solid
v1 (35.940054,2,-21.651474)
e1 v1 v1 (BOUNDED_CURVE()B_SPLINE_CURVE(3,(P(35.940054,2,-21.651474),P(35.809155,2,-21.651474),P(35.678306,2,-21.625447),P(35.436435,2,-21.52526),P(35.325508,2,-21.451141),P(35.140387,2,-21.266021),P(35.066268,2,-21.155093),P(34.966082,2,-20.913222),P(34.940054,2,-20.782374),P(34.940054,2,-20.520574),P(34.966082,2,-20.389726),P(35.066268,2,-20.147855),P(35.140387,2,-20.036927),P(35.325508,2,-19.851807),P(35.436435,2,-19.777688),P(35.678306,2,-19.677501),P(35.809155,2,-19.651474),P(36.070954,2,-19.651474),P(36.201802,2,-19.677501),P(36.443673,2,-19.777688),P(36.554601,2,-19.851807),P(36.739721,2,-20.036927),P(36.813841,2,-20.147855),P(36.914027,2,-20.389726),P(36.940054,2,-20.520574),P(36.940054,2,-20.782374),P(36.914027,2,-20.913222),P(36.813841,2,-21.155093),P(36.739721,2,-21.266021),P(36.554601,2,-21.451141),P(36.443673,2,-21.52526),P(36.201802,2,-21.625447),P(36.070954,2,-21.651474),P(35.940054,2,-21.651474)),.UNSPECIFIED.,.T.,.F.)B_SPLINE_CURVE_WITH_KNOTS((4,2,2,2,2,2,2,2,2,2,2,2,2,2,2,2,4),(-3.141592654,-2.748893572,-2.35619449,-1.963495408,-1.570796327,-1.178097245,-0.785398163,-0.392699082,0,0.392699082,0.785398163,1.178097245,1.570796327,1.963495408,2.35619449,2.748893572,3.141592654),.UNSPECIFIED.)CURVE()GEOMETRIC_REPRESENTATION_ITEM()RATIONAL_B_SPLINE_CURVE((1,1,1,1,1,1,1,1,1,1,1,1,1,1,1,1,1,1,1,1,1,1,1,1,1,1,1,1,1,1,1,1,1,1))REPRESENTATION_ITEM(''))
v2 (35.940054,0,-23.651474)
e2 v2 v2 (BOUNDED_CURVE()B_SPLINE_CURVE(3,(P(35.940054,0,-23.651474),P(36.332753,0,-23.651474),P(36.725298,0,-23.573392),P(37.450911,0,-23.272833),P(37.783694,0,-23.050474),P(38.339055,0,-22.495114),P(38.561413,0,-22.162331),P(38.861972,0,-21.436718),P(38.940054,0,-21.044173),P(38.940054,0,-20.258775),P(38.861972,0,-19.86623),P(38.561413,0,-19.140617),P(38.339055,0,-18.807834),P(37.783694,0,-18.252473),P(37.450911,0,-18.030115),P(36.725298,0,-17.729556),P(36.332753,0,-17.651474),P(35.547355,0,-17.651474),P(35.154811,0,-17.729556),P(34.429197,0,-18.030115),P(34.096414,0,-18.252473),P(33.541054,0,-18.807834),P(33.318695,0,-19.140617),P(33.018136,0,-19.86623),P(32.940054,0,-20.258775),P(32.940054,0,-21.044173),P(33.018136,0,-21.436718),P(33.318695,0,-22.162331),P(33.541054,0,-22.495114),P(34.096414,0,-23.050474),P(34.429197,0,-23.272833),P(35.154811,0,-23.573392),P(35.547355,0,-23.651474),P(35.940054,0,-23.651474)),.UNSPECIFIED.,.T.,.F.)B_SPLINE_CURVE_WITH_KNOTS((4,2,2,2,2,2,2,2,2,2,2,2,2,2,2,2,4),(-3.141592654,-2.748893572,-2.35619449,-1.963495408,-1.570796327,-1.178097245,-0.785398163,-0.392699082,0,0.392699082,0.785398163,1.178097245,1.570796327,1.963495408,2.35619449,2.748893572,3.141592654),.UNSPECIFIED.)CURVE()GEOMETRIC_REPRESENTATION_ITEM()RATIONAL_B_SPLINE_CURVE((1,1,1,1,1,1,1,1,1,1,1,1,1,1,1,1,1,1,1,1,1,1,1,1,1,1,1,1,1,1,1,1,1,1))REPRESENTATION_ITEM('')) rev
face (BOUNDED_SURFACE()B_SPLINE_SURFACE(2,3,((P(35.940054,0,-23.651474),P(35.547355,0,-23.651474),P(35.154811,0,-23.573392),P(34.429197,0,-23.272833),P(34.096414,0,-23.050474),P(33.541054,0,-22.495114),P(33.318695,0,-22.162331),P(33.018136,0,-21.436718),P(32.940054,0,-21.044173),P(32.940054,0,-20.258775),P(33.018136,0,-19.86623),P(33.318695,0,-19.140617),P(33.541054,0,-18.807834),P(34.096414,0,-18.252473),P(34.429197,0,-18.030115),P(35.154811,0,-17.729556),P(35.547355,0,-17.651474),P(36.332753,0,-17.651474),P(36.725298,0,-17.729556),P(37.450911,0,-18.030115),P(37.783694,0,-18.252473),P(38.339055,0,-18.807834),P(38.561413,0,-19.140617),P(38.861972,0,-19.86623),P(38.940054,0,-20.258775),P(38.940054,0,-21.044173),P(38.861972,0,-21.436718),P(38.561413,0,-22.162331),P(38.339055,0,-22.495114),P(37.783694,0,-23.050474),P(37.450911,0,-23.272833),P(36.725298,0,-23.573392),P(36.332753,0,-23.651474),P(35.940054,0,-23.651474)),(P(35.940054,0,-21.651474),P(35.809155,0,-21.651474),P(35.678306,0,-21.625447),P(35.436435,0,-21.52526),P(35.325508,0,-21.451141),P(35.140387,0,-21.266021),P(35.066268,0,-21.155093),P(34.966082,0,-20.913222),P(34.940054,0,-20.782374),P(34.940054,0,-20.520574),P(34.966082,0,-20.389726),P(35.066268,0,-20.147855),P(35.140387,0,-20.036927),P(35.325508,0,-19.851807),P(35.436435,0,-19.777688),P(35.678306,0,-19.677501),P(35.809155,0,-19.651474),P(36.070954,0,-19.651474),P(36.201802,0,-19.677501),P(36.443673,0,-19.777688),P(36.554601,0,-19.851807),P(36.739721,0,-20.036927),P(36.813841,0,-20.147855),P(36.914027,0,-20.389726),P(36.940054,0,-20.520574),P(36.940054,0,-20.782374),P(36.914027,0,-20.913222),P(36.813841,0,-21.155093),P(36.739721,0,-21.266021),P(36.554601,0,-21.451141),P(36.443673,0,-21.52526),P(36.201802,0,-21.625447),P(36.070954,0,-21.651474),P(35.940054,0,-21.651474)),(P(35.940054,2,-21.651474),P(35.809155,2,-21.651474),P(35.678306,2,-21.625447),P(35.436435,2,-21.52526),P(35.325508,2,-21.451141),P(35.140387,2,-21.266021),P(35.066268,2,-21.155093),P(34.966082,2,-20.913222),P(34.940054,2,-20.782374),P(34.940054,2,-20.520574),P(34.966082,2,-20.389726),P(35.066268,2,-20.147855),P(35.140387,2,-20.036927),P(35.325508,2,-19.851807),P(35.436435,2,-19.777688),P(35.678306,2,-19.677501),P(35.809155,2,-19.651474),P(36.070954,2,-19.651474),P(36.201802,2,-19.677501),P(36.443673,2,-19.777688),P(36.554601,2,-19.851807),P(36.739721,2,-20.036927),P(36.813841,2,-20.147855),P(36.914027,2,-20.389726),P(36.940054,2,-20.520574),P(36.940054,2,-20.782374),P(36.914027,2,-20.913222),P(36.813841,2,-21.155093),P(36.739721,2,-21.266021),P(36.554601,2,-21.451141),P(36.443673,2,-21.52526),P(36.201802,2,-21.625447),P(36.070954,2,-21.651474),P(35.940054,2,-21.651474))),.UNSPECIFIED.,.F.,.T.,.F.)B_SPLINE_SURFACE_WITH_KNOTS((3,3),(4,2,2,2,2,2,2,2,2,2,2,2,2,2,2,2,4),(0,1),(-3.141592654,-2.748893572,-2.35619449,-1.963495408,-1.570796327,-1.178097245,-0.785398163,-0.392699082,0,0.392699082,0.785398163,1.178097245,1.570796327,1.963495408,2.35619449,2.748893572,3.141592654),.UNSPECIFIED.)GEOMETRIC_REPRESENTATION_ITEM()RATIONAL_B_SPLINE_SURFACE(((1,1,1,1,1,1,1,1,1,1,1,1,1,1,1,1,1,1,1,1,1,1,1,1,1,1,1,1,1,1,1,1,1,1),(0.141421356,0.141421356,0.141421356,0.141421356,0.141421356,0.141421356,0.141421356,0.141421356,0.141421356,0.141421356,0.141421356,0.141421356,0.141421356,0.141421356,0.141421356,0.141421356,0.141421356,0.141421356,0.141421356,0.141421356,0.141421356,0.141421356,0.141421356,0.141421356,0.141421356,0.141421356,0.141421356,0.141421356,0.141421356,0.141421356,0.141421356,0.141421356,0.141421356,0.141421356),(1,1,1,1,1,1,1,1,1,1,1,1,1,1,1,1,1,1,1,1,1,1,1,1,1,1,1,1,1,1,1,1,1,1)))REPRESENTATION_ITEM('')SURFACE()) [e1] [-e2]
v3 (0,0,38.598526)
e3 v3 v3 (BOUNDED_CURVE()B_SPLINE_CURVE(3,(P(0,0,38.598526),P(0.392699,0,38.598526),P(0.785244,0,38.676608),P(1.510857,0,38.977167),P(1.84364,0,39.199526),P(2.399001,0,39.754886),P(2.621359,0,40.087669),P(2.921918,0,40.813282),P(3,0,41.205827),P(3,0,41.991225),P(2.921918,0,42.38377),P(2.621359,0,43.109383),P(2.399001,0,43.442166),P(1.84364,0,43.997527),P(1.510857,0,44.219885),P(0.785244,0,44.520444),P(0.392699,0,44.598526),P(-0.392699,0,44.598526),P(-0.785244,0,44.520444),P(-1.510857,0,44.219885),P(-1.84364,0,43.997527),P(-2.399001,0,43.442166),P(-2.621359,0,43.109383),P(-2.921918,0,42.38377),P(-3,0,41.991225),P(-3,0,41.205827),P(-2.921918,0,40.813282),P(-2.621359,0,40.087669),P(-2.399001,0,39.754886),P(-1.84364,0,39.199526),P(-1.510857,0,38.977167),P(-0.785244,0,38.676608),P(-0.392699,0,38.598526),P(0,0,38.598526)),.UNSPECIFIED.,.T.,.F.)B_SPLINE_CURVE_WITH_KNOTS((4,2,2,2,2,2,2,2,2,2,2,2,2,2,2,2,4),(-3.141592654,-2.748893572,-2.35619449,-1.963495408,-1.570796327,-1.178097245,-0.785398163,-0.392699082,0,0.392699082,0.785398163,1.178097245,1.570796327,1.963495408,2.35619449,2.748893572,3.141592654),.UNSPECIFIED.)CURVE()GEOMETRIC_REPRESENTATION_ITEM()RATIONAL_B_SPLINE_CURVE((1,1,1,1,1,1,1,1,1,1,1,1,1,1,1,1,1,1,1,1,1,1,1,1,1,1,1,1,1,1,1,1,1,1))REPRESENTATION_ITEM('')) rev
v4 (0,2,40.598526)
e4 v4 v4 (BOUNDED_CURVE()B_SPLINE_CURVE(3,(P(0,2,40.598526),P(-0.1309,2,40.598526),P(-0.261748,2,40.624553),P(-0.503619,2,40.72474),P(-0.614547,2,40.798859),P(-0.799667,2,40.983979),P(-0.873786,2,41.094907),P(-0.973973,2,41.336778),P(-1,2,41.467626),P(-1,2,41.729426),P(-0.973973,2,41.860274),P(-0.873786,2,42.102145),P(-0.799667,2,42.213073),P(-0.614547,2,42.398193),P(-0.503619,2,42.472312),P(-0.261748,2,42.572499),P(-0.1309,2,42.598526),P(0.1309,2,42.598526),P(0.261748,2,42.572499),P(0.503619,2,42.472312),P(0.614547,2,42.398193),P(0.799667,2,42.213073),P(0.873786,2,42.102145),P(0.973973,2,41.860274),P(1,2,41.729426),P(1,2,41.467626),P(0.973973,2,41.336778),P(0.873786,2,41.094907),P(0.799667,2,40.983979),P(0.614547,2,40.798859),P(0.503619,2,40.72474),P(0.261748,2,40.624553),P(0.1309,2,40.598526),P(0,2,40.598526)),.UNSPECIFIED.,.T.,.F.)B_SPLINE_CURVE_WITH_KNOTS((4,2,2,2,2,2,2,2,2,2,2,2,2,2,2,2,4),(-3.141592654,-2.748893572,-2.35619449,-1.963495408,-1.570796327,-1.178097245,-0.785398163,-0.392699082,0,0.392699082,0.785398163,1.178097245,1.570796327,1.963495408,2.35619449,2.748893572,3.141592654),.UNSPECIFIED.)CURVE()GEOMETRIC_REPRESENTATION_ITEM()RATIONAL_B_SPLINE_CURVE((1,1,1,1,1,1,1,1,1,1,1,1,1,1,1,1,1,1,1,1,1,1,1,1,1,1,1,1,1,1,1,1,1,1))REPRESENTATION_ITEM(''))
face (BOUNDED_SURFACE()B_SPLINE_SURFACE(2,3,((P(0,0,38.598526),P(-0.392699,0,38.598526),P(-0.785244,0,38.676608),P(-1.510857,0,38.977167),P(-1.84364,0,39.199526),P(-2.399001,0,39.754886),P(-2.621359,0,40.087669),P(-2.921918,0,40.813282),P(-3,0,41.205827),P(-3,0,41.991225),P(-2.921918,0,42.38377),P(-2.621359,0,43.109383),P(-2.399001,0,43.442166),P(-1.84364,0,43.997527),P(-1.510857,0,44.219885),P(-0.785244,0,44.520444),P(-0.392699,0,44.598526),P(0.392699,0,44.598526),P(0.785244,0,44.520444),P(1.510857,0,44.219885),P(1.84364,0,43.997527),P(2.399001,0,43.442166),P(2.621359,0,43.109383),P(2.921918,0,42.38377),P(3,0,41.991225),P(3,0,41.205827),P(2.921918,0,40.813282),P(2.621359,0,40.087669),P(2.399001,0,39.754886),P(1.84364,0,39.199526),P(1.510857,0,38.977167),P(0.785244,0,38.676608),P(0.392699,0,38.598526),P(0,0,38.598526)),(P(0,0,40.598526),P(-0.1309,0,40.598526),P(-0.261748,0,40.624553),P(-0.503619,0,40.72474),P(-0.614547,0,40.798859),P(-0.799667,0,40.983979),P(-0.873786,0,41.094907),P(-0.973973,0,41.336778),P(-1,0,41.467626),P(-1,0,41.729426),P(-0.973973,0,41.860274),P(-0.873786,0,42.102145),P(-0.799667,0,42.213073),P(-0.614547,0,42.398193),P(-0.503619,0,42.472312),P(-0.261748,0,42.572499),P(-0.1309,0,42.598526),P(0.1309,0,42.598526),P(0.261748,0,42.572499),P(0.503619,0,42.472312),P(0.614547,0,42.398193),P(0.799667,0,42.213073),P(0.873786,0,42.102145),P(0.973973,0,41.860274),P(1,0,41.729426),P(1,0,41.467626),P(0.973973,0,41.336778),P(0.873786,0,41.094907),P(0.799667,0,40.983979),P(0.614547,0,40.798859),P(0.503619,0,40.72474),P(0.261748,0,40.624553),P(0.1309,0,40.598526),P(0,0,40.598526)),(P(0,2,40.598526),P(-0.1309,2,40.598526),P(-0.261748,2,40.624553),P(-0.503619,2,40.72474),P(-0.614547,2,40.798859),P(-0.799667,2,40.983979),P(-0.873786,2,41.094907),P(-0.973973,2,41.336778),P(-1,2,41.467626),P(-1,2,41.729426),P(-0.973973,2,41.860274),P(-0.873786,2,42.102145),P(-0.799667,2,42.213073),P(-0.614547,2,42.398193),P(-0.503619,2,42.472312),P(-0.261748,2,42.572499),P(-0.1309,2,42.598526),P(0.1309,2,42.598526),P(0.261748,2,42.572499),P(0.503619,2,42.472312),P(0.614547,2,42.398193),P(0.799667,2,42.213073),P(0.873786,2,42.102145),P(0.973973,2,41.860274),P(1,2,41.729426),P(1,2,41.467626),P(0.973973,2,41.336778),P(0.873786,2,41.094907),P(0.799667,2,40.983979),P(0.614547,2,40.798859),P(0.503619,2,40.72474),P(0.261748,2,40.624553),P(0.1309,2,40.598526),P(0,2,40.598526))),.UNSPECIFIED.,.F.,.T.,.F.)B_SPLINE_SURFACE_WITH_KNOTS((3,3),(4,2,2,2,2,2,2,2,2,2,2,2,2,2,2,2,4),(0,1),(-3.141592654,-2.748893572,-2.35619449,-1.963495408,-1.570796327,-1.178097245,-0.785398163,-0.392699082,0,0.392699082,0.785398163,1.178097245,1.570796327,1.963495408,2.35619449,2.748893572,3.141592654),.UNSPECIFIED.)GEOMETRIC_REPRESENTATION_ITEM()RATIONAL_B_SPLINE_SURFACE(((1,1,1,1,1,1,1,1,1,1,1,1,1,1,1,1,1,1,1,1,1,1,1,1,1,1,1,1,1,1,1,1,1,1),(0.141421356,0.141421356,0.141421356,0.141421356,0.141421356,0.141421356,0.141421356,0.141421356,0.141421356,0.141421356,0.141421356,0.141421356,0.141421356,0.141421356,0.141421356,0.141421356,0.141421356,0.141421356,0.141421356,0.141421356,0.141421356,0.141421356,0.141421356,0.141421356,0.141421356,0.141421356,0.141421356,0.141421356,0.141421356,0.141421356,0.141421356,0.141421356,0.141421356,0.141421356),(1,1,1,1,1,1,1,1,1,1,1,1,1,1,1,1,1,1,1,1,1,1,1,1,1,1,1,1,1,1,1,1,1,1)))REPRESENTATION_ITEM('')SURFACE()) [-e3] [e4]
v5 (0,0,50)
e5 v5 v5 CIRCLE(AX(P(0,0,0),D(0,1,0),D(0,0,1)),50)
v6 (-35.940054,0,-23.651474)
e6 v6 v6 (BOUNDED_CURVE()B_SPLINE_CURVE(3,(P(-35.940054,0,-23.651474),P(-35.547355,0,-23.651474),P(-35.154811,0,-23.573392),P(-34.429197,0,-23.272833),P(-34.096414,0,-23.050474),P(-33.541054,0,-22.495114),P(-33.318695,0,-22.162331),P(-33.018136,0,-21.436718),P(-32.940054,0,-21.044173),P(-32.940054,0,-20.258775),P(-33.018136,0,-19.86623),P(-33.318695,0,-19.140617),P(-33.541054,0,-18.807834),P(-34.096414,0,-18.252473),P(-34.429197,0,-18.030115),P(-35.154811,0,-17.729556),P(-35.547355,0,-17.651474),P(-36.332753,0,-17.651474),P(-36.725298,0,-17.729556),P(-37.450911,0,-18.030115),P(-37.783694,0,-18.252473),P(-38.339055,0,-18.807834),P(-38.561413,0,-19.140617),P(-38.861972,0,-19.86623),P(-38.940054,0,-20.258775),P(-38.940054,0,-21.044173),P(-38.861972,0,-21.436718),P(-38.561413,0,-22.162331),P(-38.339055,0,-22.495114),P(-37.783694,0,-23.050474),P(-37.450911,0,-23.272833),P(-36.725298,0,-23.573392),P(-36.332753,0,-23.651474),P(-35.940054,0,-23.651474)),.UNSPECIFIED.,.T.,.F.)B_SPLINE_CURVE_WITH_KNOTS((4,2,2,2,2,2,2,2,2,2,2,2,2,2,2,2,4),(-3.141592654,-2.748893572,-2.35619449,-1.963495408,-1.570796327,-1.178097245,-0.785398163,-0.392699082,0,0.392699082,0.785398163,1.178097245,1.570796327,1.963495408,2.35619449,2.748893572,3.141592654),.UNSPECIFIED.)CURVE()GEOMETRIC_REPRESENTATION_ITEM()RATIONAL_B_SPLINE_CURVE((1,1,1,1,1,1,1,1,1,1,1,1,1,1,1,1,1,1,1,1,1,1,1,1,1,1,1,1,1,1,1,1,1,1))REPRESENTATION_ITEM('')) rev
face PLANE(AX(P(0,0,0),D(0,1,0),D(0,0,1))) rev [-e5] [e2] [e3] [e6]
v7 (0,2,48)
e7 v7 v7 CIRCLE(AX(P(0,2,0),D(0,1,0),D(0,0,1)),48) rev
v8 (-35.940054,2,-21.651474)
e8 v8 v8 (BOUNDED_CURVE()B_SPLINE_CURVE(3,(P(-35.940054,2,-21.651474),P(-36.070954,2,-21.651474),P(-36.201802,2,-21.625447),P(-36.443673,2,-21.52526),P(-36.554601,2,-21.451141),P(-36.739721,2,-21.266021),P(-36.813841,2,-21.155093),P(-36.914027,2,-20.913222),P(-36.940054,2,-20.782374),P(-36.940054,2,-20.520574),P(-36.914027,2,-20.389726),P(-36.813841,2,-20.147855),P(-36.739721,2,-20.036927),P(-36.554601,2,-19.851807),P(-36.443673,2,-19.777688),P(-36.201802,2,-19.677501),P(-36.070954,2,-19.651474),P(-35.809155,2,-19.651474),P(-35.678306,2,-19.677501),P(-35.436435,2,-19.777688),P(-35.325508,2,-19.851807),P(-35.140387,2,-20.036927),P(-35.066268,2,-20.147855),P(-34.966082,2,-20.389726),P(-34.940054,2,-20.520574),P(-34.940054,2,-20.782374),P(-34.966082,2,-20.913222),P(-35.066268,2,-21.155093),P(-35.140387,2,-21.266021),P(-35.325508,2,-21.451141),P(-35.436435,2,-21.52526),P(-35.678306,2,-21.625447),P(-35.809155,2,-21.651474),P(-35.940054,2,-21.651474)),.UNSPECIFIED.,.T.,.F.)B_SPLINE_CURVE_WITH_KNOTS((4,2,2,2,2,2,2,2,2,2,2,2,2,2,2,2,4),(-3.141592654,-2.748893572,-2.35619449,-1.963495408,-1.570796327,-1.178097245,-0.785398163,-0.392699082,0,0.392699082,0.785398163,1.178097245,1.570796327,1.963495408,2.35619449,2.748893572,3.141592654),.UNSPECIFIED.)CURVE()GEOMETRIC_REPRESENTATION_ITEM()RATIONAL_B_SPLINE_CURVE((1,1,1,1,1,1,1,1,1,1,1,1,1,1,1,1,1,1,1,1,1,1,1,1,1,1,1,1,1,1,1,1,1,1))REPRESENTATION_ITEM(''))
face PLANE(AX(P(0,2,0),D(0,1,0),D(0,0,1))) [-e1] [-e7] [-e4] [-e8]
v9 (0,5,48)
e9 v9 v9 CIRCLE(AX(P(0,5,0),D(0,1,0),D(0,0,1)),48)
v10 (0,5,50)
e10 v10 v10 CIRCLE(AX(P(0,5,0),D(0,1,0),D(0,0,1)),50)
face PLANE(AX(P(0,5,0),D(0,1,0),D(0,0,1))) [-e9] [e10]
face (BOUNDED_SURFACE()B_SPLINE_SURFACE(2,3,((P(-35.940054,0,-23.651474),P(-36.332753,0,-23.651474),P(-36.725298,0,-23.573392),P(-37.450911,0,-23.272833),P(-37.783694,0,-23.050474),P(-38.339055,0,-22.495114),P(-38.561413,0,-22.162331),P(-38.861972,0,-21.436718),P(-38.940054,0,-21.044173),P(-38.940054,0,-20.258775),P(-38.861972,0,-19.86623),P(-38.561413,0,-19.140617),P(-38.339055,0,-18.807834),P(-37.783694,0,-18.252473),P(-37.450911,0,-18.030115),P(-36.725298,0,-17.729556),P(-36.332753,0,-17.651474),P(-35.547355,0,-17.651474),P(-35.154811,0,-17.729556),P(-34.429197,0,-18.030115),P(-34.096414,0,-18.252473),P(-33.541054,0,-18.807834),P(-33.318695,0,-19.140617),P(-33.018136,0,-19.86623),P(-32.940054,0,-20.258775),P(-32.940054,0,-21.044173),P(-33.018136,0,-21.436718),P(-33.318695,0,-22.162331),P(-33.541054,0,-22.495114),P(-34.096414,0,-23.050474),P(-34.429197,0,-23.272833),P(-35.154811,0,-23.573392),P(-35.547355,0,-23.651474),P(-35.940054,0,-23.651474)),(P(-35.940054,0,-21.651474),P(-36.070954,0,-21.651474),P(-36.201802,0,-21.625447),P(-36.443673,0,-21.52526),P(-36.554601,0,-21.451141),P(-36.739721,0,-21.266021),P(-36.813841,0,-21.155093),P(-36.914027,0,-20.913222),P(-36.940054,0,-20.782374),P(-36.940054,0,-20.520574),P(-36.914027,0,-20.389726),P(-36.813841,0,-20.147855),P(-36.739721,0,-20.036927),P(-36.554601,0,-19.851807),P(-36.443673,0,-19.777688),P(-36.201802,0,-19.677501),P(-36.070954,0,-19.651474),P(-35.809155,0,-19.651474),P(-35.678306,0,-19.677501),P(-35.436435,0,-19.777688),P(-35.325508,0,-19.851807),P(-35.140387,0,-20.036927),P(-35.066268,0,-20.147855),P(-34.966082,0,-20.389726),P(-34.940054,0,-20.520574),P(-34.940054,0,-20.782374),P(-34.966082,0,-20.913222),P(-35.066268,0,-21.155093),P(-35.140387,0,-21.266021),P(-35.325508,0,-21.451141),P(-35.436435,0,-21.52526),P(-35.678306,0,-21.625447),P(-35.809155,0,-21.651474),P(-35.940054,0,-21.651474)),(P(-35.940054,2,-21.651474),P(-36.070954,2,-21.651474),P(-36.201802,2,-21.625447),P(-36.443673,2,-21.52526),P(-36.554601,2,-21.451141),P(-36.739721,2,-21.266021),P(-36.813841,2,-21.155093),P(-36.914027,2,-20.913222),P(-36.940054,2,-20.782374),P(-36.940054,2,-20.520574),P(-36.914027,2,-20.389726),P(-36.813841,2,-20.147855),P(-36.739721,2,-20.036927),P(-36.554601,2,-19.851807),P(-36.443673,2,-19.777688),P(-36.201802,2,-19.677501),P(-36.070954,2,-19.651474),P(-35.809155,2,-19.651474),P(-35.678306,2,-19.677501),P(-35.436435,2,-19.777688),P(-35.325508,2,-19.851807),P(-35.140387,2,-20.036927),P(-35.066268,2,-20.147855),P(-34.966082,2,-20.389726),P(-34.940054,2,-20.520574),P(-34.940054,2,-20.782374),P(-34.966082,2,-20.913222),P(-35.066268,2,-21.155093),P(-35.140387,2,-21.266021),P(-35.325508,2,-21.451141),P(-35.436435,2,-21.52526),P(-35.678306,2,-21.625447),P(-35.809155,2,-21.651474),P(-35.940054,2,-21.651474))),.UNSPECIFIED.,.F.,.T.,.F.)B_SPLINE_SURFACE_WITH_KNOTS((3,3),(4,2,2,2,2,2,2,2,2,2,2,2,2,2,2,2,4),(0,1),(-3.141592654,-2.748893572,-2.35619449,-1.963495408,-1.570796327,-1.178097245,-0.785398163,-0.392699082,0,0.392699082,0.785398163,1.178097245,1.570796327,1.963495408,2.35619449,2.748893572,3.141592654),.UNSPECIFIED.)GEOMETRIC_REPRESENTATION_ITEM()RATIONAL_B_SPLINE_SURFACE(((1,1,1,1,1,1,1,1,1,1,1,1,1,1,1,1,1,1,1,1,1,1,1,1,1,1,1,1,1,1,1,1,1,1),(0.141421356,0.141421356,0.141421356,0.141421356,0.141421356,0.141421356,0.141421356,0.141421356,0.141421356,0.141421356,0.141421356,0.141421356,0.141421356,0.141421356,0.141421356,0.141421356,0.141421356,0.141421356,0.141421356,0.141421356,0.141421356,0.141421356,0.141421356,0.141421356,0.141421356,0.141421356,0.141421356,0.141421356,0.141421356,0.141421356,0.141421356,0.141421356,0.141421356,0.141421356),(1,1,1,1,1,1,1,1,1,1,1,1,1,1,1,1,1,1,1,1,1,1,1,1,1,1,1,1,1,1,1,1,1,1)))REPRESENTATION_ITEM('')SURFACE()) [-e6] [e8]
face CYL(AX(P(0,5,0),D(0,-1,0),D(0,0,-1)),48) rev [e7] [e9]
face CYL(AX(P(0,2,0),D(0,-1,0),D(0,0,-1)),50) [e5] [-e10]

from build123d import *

# Parameters (mm, degrees)
SKETCH_1_R          = 50
EXTRUDE_1_DEPTH     = 2
SKETCH_2_R          = 50
SKETCH_2_R_2        = 48
EXTRUDE_2_DEPTH     = 3
SKETCH_3_R          = 1
CUT_EXTRUDE_1_DEPTH = 20
FILLET_1_SIZE       = 2


with BuildPart() as part:
    # 草图1 → 凸台-拉伸1 (new body)
    with BuildSketch(Plane(origin=(0, 0, 0), x_dir=(1, 0, 0), z_dir=(0, 1, 0))):
        with Locations(Location((0, 0, 0), (0, 0, 270))):
            Circle(SKETCH_1_R)
    extrude(amount=EXTRUDE_1_DEPTH)

    # 草图2 → 凸台-拉伸2 (add)
    with BuildSketch(Plane(origin=(0, 2, 0), x_dir=(1, 0, 0), z_dir=(0, 1, 0))):
        with Locations(Location((0, 0, 0), (0, 0, 270))):
            Circle(SKETCH_2_R)
        with Locations(Location((0, 0, 0), (0, 0, 270))):
            Circle(SKETCH_2_R_2, mode=Mode.SUBTRACT)
    extrude(amount=EXTRUDE_2_DEPTH)

    # 草图3 → 切除-拉伸1 (cut)
    with BuildSketch(Plane.XZ):
        with Locations(Location((0, 41.598526054, 0), (0, 0, 270))):
            Circle(SKETCH_3_R)
        with Locations(Location((-35.940054257, -20.651473946, 0), (0, 0, 270))):
            Circle(SKETCH_3_R)
        with Locations(Location((35.940054257, -20.651473946, 0), (0, 0, 270))):
            Circle(SKETCH_3_R)
    extrude(amount=-CUT_EXTRUDE_1_DEPTH, mode=Mode.SUBTRACT)

    # 圆角1
    # a fillet whose section is not a circle: 2 mm, written as the material it takes off along each edge
    with BuildSketch(Plane(origin=(0, 0, 41.598526054), x_dir=(0, 0, -1), z_dir=(-1, 0, 0))) as fillet_1_piece_1:
        with BuildLine():
            Bezier((1 + FILLET_1_SIZE, 0), (1, 0), (1, -FILLET_1_SIZE), weights=[1, 0.141421356, 1])
            Line((1, -FILLET_1_SIZE), (1, 0))
            Line((1, 0), (1 + FILLET_1_SIZE, 0))
        make_face()
    revolve(axis=Axis((0, 0, 41.598526054), (0, -1, 0)), mode=Mode.SUBTRACT)
    with BuildSketch(Plane(origin=(-35.940054257, 0, -20.651473946), x_dir=(0, 0, -1), z_dir=(-1, 0, 0))) as fillet_1_piece_2:
        with BuildLine():
            Bezier((1 + FILLET_1_SIZE, 0), (1, 0), (1, -FILLET_1_SIZE), weights=[1, 0.141421356, 1])
            Line((1, -FILLET_1_SIZE), (1, 0))
            Line((1, 0), (1 + FILLET_1_SIZE, 0))
        make_face()
    revolve(axis=Axis((-35.940054257, 0, -20.651473946), (0, -1, 0)), mode=Mode.SUBTRACT)
    with BuildSketch(Plane(origin=(35.940054257, 0, -20.651473946), x_dir=(0, 0, -1), z_dir=(-1, 0, 0))) as fillet_1_piece_3:
        with BuildLine():
            Bezier((1 + FILLET_1_SIZE, 0), (1, 0), (1, -FILLET_1_SIZE), weights=[1, 0.141421356, 1])
            Line((1, -FILLET_1_SIZE), (1, 0))
            Line((1, 0), (1 + FILLET_1_SIZE, 0))
        make_face()
    revolve(axis=Axis((35.940054257, 0, -20.651473946), (0, -1, 0)), mode=Mode.SUBTRACT)


solid = part.part
